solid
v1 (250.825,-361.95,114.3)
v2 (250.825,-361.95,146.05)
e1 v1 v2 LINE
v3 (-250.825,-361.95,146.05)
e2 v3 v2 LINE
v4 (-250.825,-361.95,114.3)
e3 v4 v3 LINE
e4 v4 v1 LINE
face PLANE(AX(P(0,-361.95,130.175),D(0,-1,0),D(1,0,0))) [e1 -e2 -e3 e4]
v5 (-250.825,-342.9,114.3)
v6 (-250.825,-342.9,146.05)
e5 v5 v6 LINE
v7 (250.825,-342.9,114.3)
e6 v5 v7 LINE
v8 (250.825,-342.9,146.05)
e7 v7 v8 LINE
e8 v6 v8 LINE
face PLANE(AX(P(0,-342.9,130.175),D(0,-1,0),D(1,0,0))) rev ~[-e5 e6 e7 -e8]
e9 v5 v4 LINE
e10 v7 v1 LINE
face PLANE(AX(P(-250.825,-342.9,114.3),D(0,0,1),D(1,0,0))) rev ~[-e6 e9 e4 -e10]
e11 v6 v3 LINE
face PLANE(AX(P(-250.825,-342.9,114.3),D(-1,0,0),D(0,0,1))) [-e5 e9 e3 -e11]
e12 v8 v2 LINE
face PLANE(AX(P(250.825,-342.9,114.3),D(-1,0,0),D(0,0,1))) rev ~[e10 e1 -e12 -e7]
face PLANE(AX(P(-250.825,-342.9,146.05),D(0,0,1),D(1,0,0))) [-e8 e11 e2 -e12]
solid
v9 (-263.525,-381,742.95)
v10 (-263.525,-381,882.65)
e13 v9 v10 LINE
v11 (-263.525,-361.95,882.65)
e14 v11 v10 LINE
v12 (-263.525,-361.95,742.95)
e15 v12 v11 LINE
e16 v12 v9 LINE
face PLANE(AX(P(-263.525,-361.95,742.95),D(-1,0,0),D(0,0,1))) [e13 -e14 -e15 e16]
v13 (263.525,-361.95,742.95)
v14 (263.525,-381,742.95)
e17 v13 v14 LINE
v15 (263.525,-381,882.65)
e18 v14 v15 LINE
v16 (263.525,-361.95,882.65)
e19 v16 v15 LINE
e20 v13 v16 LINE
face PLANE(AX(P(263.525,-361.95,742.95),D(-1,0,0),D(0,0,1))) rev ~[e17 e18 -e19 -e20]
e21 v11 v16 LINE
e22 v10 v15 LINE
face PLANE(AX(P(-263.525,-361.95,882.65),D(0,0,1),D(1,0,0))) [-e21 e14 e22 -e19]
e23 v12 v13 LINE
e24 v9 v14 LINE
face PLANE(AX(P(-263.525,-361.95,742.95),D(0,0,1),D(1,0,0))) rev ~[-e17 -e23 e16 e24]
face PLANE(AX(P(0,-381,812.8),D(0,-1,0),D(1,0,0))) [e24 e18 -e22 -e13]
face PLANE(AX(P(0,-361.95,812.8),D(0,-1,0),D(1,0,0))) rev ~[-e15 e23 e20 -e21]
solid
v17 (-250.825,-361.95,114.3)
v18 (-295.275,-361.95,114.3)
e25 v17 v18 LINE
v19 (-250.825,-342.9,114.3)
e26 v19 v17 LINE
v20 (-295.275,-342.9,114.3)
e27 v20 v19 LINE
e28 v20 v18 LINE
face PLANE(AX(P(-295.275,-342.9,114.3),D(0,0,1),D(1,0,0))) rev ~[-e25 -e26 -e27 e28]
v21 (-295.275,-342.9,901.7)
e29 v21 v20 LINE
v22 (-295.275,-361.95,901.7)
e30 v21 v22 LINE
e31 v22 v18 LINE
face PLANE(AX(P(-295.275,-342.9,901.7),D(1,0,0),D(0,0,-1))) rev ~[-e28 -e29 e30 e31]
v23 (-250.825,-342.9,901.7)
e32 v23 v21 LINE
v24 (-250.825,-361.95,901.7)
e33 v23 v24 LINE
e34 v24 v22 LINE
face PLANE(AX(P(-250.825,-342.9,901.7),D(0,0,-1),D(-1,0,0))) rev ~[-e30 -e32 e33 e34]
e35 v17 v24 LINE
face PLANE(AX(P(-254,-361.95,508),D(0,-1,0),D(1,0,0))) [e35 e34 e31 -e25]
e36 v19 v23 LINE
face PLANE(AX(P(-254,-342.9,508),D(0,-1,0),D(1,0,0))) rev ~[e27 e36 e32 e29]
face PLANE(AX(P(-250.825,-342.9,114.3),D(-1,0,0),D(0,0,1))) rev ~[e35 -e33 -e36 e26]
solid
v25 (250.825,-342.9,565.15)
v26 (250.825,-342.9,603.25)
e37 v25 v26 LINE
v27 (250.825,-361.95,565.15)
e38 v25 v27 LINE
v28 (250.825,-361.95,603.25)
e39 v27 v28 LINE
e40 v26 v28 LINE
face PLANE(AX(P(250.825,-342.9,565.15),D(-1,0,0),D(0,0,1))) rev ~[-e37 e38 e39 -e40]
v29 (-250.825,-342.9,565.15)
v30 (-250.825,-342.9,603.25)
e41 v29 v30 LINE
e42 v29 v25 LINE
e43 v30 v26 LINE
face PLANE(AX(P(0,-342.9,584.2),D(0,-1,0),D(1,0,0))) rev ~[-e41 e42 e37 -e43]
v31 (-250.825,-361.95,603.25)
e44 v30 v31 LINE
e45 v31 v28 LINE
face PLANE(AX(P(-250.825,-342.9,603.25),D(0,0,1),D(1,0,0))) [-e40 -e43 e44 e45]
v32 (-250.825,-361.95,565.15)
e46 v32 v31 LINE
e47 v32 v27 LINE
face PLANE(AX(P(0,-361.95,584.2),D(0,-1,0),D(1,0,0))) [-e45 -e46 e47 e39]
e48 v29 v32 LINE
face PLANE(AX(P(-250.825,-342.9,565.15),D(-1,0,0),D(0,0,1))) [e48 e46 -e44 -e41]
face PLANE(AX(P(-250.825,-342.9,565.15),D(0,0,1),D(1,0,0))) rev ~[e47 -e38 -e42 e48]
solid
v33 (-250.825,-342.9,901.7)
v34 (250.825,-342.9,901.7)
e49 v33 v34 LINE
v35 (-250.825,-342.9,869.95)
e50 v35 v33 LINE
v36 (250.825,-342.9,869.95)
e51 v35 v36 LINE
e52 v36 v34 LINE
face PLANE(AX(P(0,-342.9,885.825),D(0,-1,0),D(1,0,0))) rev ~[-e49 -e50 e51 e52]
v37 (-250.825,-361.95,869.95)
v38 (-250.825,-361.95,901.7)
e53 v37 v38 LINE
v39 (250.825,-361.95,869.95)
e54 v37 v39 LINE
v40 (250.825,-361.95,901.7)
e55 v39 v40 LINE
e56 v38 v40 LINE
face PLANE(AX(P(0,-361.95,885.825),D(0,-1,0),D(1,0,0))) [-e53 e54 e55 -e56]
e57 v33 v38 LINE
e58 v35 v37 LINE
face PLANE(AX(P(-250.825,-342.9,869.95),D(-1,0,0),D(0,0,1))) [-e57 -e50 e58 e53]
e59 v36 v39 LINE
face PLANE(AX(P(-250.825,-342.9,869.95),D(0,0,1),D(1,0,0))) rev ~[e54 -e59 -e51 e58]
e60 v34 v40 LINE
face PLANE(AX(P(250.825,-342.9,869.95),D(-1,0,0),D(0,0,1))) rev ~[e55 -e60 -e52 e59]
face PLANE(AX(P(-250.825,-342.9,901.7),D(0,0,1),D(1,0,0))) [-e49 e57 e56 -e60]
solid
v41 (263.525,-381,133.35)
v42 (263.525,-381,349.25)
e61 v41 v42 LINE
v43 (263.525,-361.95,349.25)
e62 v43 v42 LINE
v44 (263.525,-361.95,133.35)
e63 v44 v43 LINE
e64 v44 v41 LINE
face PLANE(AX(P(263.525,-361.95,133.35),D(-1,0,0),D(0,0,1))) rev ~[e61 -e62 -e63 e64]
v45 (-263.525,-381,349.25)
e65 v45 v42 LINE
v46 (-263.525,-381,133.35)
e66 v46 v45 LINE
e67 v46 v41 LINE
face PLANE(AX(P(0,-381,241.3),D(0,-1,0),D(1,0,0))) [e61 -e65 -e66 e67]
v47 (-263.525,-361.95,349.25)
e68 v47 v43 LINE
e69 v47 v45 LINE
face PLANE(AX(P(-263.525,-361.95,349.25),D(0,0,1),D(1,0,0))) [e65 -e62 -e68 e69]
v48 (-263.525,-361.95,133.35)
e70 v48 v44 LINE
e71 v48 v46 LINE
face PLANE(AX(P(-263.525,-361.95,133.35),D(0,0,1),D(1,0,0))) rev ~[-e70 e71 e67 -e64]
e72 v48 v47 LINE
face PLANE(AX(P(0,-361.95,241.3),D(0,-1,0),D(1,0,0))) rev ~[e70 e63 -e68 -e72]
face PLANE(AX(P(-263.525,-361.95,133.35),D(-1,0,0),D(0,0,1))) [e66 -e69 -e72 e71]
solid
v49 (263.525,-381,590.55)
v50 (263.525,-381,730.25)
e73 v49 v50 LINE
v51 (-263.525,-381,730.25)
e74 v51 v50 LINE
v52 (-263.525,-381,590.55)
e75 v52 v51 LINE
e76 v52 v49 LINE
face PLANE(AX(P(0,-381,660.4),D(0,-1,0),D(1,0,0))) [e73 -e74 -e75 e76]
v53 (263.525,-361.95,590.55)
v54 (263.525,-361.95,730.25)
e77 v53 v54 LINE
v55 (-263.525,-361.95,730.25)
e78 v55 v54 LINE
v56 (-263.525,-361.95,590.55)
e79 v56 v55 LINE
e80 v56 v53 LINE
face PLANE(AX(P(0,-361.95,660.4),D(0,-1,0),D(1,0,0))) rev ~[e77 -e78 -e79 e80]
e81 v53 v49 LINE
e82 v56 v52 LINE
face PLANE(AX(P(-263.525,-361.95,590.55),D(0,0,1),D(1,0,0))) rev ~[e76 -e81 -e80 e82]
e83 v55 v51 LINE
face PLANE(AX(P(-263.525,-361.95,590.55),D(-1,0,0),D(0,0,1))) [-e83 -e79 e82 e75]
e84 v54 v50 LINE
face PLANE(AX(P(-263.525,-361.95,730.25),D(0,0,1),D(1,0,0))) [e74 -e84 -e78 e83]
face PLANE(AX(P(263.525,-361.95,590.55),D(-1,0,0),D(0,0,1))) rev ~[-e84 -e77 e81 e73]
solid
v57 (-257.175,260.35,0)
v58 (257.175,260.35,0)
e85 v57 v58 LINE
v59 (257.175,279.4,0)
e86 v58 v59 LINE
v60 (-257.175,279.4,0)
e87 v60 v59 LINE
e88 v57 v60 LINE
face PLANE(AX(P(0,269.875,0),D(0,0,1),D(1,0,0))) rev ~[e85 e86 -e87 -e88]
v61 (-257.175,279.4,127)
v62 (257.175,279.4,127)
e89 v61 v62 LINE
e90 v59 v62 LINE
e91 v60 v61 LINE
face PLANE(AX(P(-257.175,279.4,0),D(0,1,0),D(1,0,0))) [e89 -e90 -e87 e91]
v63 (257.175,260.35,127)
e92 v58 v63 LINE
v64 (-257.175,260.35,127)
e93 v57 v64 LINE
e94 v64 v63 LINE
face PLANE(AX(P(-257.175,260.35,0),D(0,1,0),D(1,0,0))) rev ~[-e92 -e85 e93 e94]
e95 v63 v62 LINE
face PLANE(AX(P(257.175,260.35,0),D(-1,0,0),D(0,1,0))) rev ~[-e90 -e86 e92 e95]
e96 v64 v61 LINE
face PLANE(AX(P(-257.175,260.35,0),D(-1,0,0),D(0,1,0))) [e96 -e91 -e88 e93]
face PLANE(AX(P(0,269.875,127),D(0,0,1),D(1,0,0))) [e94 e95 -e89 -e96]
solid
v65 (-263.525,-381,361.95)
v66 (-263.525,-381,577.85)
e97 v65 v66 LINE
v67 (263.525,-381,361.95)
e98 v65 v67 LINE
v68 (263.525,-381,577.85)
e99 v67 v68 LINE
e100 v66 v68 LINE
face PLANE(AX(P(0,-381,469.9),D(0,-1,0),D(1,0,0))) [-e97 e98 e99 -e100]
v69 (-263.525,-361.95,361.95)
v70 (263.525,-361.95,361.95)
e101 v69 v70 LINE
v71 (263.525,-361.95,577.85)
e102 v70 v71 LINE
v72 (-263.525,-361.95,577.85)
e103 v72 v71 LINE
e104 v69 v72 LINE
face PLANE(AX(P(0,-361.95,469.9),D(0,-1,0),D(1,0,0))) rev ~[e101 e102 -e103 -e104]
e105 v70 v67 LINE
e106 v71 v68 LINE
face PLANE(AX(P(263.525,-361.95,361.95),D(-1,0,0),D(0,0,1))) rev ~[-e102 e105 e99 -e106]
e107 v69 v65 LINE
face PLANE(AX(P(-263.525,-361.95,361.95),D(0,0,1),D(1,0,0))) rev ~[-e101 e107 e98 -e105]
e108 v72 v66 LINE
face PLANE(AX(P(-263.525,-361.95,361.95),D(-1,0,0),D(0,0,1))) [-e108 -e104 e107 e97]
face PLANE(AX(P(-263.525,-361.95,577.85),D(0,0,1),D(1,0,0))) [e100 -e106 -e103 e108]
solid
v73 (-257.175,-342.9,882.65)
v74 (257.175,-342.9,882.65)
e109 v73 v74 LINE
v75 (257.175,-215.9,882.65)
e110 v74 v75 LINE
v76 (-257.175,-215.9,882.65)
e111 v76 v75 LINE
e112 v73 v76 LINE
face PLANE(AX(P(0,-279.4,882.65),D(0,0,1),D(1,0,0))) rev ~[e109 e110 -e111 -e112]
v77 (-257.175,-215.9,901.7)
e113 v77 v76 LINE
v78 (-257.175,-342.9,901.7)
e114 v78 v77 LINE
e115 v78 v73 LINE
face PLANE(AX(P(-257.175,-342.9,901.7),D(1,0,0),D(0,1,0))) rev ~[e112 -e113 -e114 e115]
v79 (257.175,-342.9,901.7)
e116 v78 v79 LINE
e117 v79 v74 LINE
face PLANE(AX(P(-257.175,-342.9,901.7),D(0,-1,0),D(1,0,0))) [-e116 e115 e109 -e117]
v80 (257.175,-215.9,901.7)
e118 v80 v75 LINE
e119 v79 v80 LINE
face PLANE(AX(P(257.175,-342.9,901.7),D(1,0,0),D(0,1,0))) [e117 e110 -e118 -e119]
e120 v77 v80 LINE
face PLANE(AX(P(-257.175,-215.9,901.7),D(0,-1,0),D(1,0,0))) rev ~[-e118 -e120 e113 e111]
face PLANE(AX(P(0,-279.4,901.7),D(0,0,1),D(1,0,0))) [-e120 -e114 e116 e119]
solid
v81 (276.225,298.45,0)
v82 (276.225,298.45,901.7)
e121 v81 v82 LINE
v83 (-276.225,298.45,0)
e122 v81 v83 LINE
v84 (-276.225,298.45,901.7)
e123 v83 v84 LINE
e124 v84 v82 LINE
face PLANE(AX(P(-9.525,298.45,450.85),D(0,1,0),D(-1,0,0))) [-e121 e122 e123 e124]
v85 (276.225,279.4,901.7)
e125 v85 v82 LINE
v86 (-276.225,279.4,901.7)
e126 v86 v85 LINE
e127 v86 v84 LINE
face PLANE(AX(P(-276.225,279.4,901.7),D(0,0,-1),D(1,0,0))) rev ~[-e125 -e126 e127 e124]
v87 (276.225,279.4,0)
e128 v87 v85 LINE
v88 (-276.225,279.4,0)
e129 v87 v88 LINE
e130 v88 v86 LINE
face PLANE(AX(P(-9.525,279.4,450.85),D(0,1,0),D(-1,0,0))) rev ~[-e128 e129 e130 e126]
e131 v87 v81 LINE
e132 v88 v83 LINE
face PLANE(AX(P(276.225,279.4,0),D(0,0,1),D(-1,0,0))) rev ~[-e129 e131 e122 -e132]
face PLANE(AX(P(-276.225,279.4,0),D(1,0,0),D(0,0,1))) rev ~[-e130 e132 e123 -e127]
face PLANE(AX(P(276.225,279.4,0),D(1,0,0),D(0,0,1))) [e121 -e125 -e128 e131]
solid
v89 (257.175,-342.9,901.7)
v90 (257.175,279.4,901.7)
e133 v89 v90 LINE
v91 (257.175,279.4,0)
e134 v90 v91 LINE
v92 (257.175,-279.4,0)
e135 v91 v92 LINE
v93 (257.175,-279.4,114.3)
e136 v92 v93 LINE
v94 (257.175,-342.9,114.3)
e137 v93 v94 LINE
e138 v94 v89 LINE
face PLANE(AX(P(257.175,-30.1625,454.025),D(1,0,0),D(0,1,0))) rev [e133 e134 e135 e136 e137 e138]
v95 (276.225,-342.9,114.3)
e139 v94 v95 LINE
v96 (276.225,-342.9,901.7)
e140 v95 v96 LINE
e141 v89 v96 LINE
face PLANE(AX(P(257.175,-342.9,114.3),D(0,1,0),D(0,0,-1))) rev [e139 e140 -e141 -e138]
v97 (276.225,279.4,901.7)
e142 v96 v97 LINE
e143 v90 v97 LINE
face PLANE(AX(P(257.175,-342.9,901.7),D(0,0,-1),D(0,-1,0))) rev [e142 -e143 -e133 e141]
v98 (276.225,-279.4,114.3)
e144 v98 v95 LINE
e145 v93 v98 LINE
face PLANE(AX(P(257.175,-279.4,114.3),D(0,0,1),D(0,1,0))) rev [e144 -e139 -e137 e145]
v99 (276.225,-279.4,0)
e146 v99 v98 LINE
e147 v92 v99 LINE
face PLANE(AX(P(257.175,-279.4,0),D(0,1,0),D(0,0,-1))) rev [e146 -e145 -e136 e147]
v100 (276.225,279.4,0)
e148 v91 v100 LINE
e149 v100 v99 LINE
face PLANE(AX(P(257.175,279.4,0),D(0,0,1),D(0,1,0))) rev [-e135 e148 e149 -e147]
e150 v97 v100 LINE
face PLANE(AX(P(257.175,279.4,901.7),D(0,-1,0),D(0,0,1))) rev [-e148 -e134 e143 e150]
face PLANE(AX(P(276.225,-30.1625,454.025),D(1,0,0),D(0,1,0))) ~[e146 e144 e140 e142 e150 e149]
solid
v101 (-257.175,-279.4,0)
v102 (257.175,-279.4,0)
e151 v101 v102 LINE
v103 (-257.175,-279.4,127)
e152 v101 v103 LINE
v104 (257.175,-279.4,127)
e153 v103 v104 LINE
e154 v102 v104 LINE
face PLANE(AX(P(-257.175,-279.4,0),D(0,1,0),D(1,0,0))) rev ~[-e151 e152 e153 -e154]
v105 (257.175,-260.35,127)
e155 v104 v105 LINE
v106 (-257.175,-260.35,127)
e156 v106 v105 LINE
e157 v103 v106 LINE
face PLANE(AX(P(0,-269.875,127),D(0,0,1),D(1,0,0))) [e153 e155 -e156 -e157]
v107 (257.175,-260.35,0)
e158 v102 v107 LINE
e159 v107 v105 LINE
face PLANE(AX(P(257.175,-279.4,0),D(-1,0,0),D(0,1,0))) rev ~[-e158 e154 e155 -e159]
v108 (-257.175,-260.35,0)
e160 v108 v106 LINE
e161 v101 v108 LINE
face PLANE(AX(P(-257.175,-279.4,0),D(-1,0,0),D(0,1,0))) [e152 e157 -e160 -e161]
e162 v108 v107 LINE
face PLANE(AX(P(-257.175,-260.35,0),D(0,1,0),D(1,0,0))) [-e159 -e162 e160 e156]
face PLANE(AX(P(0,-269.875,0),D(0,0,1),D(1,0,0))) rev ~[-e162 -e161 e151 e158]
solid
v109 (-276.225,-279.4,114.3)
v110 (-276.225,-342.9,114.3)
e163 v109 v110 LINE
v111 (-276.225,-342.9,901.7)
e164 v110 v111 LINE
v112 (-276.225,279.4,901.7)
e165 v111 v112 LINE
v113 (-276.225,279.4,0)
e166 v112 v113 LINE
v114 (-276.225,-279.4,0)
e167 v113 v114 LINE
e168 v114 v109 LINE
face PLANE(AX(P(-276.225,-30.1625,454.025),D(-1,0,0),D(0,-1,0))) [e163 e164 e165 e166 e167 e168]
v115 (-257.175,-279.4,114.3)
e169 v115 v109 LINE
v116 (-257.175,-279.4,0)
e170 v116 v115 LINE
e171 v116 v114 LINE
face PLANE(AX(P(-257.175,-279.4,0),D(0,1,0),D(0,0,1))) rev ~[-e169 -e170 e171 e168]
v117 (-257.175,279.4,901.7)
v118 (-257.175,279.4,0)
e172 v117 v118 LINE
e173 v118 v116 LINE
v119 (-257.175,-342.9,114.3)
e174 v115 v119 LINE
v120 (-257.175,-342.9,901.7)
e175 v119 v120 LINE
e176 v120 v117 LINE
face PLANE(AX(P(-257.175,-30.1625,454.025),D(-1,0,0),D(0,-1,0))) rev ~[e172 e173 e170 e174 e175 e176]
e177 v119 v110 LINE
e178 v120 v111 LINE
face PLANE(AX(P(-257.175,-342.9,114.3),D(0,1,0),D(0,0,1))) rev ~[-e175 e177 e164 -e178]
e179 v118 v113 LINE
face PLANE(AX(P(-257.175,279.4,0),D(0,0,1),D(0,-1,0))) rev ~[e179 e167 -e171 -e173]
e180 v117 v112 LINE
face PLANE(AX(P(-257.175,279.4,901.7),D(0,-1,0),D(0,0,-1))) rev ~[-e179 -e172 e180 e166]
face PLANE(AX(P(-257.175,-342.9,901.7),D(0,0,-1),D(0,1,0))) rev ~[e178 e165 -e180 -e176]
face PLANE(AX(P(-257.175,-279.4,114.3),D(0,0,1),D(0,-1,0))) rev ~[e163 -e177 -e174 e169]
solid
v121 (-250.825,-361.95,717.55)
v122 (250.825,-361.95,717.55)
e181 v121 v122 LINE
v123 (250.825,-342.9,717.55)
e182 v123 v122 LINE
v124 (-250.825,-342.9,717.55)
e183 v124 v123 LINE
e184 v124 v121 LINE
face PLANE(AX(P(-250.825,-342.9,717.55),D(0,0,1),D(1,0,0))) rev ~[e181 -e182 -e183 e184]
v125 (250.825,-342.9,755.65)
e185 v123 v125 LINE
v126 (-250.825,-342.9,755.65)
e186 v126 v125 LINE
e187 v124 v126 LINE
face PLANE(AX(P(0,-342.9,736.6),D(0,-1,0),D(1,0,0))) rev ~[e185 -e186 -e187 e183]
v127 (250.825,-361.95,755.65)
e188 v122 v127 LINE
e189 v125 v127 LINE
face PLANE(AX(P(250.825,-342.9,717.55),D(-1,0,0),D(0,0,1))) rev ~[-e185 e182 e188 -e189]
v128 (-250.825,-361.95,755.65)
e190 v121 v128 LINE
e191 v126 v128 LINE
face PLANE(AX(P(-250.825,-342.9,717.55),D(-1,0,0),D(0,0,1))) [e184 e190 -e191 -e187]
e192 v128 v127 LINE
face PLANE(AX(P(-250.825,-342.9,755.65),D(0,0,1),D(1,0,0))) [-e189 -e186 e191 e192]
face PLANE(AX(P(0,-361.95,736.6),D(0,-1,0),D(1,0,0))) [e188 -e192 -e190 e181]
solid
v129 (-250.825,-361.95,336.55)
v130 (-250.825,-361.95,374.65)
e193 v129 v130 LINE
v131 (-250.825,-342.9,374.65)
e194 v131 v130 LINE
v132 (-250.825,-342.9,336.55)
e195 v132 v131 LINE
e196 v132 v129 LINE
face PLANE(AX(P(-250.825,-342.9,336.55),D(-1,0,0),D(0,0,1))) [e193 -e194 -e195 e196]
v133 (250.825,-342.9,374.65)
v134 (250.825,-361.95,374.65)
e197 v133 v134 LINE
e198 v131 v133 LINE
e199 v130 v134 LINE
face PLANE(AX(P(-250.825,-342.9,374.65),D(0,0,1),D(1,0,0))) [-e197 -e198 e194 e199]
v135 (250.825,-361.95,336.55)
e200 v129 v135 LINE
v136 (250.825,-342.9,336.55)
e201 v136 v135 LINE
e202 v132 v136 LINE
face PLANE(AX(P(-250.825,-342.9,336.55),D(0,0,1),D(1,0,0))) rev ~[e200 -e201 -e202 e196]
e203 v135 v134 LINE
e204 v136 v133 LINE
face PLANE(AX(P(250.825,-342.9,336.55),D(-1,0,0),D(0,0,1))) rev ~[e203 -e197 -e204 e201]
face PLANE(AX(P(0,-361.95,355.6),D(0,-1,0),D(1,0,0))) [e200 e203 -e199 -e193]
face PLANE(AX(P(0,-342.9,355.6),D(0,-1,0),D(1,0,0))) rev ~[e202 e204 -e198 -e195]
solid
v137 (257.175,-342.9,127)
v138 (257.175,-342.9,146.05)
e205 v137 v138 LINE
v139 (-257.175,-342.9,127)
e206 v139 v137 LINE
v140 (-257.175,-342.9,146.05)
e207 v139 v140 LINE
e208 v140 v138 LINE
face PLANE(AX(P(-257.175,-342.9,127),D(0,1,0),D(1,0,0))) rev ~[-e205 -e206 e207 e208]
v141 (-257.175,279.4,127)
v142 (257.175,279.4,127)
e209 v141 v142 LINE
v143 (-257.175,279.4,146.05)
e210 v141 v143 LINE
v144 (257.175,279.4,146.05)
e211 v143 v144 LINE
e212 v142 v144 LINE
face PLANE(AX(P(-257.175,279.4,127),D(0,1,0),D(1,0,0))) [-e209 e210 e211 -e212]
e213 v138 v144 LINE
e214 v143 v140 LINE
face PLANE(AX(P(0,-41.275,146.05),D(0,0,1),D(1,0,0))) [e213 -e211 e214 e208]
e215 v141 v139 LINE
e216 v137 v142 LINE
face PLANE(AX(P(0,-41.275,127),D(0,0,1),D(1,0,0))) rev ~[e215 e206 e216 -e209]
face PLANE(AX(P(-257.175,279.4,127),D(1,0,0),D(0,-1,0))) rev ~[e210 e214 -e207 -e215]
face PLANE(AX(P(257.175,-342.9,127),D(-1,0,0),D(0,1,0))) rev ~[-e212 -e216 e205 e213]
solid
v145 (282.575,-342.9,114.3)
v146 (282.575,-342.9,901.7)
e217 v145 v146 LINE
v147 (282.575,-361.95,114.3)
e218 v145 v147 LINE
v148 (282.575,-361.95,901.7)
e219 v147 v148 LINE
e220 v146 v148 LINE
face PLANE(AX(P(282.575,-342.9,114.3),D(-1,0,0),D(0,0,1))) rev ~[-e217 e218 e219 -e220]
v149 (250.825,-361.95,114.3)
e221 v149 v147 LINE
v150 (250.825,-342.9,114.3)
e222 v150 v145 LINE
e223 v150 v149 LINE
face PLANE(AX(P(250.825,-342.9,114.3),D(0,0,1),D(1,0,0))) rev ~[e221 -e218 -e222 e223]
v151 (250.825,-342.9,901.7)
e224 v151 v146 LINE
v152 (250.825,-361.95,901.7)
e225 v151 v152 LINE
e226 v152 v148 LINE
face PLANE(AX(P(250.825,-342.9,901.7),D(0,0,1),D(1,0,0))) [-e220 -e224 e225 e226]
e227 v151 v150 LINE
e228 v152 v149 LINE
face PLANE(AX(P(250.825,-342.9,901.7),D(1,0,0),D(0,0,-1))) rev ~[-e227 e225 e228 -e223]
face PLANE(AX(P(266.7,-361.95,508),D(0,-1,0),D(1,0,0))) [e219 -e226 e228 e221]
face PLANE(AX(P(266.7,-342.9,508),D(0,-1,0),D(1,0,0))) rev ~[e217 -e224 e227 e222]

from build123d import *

# Parameters (mm, degrees)
F0_W      = 514.35
F0_H      = 19.05
F1_DEPTH  = 127
F2_W      = 19.05
F2_H      = 127
F3_DEPTH  = 19.05
F5_W      = 514.35
F5_H      = 603.25
F5_H_2    = 19.05
F6_DEPTH  = 19.05
F7_W      = 514.35
F7_H      = 127
F8_DEPTH  = 19.05
F9_W      = 501.65
F9_H      = 31.75
F10_DEPTH = 19.05
F11_DEPTH = 19.05
F9_W_2    = 19.05
F9_W_3    = 6.35
F9_H_2    = 723.9
F12_DEPTH = 19.05
F9_W_4    = 31.75
F13_DEPTH = 19.05
F9_H_3    = 38.1
F14_DEPTH = 19.05
F15_W     = 533.4
F15_H     = 901.7
F15_W_2   = 19.05
F16_DEPTH = 19.05
F17_W     = 527.05
F17_H     = 139.7
F18_DEPTH = 19.05
F17_H_2   = 215.9


with BuildPart() as f1:
    # F0 (on Top) → F1 (new body)
    with BuildSketch(Plane.XY):
        with Locations((0, 269.875)):
            Rectangle(F0_W, F0_H)
    extrude(amount=F1_DEPTH)


with BuildPart() as f1b:
    # F0 (on Top) → F1, piece 2 (new body)
    with BuildSketch(Plane.XY):
        with Locations((0, -269.875)):
            Rectangle(F0_W, F0_H)
    extrude(amount=F1_DEPTH)


with BuildPart() as f3:
    # F2 (on face) → F3 (new body)
    with BuildSketch(Plane(origin=(-257.175, 0, 0), x_dir=(0, -1, 0), z_dir=(-1, 0, 0))):
        Polygon((-260.35, 127), (-260.35, 0), (279.4, 0), (279.4, 114.3), (342.9, 114.3), (342.9, 901.7), (-279.4, 901.7), (-279.4, 127), align=None)
        with Locations((-269.875, 63.5)):
            Rectangle(F2_W, F2_H)
    extrude(amount=F3_DEPTH)


with BuildPart() as f4_1:
    # F4: instance of F3
    add(f3.part.mirror(Plane.YZ))


with BuildPart() as f6:
    # F5 (on face) → F6 (new body)
    with BuildSketch(Plane.XY.offset(127)):
        with Locations((0, -41.275)):
            Rectangle(F5_W, F5_H)
        with Locations((0, 269.875)):
            Rectangle(F5_W, F5_H_2)
    extrude(amount=F6_DEPTH)


with BuildPart() as f8:
    # F7 (on face) → F8 (new body)
    with BuildSketch(Plane.XY.offset(901.7)):
        with Locations((0, -279.4)):
            Rectangle(F7_W, F7_H)
    extrude(amount=-F8_DEPTH)


with BuildPart() as f10:
    # F9 (on face) → F10 (new body)
    with BuildSketch(Plane.XZ.offset(342.9)):
        with Locations((0, 885.825)):
            Rectangle(F9_W, F9_H)
    extrude(amount=F10_DEPTH)


with BuildPart() as f11:
    # F9 (on face) → F11 (new body)
    with BuildSketch(Plane.XZ.offset(342.9)):
        with Locations((0, 130.175)):
            Rectangle(F9_W, F9_H)
    extrude(amount=F11_DEPTH)


with BuildPart() as f11b:
    # F9 (on face) → F11, piece 2 (new body)
    with BuildSketch(Plane.XZ.offset(342.9)):
        with Locations((-266.7, 130.175)):
            Rectangle(F9_W_2, F9_H)
        with Locations((-279.4, 130.175)):
            Rectangle(F9_W_3, F9_H)
    extrude(amount=F11_DEPTH)

    # F9 (on face) → F12 (join)
    with BuildSketch(Plane.XZ.offset(342.9)):
        Polygon((-250.825, 869.95), (-257.175, 869.95), (-257.175, 146.05), (-250.825, 146.05), (-250.825, 336.55), (-250.825, 374.65), (-250.825, 565.15), (-250.825, 603.25), (-250.825, 717.55), (-250.825, 755.65), align=None)
        with Locations((-266.7, 508)):
            Rectangle(F9_W_2, F9_H_2)
        with Locations((-279.4, 508)):
            Rectangle(F9_W_3, F9_H_2)
        with Locations((-266.7, 885.825)):
            Rectangle(F9_W_2, F9_H)
        with Locations((-254, 885.825)):
            Rectangle(F9_W_3, F9_H)
        with Locations((-279.4, 885.825)):
            Rectangle(F9_W_3, F9_H)
        with Locations((-254, 130.175)):
            Rectangle(F9_W_3, F9_H)
        with Locations((-266.7, 130.175)):
            Rectangle(F9_W_2, F9_H)
        with Locations((-279.4, 130.175)):
            Rectangle(F9_W_3, F9_H)
        Polygon((-282.575, 869.95), (-282.575, 901.7), (-295.275, 901.7), (-295.275, 114.3), (-282.575, 114.3), (-282.575, 146.05), align=None)
    extrude(amount=F12_DEPTH)


with BuildPart() as f13:
    # F9 (on face) → F13 (new body)
    with BuildSketch(Plane.XZ.offset(342.9)):
        Polygon((282.575, 869.95), (250.825, 869.95), (250.825, 755.65), (250.825, 717.55), (250.825, 603.25), (250.825, 565.15), (250.825, 374.65), (250.825, 336.55), (250.825, 146.05), (282.575, 146.05), align=None)
        with Locations((266.7, 130.175)):
            Rectangle(F9_W_4, F9_H)
        with Locations((266.7, 885.825)):
            Rectangle(F9_W_4, F9_H)
    extrude(amount=F13_DEPTH)


with BuildPart() as f14:
    # F9 (on face) → F14 (new body)
    with BuildSketch(Plane.XZ.offset(342.9)):
        with Locations((0, 736.6)):
            Rectangle(F9_W, F9_H_3)
    extrude(amount=F14_DEPTH)


with BuildPart() as f14b:
    # F9 (on face) → F14, piece 2 (new body)
    with BuildSketch(Plane.XZ.offset(342.9)):
        with Locations((0, 355.6)):
            Rectangle(F9_W, F9_H_3)
    extrude(amount=F14_DEPTH)


with BuildPart() as f14c:
    # F9 (on face) → F14, piece 3 (new body)
    with BuildSketch(Plane.XZ.offset(342.9)):
        with Locations((0, 584.2)):
            Rectangle(F9_W, F9_H_3)
    extrude(amount=F14_DEPTH)


with BuildPart() as f16:
    # F15 (on face) → F16 (new body)
    with BuildSketch(Plane(origin=(0, 279.4, 0), x_dir=(-1, 0, 0), z_dir=(0, 1, 0))):
        with Locations((9.525, 450.85)):
            Rectangle(F15_W, F15_H)
        with Locations((-266.7, 450.85)):
            Rectangle(F15_W_2, F15_H)
    extrude(amount=F16_DEPTH)


with BuildPart() as f18:
    # F17 (on face) → F18 (new body)
    with BuildSketch(Plane.XZ.offset(361.95)):
        with Locations((0, 812.8)):
            Rectangle(F17_W, F17_H)
    extrude(amount=F18_DEPTH)


with BuildPart() as f18b:
    # F17 (on face) → F18, piece 2 (new body)
    with BuildSketch(Plane.XZ.offset(361.95)):
        with Locations((0, 660.4)):
            Rectangle(F17_W, F17_H)
    extrude(amount=F18_DEPTH)


with BuildPart() as f18c:
    # F17 (on face) → F18, piece 3 (new body)
    with BuildSketch(Plane.XZ.offset(361.95)):
        with Locations((0, 469.9)):
            Rectangle(F17_W, F17_H_2)
    extrude(amount=F18_DEPTH)


with BuildPart() as f18d:
    # F17 (on face) → F18, piece 4 (new body)
    with BuildSketch(Plane.XZ.offset(361.95)):
        with Locations((0, 241.3)):
            Rectangle(F17_W, F17_H_2)
    extrude(amount=F18_DEPTH)


solid = Compound([f1.part, f1b.part, f3.part, f4_1.part, f6.part, f8.part, f10.part, f11.part, f11b.part, f13.part, f14.part, f14b.part, f14c.part, f16.part, f18.part, f18b.part, f18c.part, f18d.part])
